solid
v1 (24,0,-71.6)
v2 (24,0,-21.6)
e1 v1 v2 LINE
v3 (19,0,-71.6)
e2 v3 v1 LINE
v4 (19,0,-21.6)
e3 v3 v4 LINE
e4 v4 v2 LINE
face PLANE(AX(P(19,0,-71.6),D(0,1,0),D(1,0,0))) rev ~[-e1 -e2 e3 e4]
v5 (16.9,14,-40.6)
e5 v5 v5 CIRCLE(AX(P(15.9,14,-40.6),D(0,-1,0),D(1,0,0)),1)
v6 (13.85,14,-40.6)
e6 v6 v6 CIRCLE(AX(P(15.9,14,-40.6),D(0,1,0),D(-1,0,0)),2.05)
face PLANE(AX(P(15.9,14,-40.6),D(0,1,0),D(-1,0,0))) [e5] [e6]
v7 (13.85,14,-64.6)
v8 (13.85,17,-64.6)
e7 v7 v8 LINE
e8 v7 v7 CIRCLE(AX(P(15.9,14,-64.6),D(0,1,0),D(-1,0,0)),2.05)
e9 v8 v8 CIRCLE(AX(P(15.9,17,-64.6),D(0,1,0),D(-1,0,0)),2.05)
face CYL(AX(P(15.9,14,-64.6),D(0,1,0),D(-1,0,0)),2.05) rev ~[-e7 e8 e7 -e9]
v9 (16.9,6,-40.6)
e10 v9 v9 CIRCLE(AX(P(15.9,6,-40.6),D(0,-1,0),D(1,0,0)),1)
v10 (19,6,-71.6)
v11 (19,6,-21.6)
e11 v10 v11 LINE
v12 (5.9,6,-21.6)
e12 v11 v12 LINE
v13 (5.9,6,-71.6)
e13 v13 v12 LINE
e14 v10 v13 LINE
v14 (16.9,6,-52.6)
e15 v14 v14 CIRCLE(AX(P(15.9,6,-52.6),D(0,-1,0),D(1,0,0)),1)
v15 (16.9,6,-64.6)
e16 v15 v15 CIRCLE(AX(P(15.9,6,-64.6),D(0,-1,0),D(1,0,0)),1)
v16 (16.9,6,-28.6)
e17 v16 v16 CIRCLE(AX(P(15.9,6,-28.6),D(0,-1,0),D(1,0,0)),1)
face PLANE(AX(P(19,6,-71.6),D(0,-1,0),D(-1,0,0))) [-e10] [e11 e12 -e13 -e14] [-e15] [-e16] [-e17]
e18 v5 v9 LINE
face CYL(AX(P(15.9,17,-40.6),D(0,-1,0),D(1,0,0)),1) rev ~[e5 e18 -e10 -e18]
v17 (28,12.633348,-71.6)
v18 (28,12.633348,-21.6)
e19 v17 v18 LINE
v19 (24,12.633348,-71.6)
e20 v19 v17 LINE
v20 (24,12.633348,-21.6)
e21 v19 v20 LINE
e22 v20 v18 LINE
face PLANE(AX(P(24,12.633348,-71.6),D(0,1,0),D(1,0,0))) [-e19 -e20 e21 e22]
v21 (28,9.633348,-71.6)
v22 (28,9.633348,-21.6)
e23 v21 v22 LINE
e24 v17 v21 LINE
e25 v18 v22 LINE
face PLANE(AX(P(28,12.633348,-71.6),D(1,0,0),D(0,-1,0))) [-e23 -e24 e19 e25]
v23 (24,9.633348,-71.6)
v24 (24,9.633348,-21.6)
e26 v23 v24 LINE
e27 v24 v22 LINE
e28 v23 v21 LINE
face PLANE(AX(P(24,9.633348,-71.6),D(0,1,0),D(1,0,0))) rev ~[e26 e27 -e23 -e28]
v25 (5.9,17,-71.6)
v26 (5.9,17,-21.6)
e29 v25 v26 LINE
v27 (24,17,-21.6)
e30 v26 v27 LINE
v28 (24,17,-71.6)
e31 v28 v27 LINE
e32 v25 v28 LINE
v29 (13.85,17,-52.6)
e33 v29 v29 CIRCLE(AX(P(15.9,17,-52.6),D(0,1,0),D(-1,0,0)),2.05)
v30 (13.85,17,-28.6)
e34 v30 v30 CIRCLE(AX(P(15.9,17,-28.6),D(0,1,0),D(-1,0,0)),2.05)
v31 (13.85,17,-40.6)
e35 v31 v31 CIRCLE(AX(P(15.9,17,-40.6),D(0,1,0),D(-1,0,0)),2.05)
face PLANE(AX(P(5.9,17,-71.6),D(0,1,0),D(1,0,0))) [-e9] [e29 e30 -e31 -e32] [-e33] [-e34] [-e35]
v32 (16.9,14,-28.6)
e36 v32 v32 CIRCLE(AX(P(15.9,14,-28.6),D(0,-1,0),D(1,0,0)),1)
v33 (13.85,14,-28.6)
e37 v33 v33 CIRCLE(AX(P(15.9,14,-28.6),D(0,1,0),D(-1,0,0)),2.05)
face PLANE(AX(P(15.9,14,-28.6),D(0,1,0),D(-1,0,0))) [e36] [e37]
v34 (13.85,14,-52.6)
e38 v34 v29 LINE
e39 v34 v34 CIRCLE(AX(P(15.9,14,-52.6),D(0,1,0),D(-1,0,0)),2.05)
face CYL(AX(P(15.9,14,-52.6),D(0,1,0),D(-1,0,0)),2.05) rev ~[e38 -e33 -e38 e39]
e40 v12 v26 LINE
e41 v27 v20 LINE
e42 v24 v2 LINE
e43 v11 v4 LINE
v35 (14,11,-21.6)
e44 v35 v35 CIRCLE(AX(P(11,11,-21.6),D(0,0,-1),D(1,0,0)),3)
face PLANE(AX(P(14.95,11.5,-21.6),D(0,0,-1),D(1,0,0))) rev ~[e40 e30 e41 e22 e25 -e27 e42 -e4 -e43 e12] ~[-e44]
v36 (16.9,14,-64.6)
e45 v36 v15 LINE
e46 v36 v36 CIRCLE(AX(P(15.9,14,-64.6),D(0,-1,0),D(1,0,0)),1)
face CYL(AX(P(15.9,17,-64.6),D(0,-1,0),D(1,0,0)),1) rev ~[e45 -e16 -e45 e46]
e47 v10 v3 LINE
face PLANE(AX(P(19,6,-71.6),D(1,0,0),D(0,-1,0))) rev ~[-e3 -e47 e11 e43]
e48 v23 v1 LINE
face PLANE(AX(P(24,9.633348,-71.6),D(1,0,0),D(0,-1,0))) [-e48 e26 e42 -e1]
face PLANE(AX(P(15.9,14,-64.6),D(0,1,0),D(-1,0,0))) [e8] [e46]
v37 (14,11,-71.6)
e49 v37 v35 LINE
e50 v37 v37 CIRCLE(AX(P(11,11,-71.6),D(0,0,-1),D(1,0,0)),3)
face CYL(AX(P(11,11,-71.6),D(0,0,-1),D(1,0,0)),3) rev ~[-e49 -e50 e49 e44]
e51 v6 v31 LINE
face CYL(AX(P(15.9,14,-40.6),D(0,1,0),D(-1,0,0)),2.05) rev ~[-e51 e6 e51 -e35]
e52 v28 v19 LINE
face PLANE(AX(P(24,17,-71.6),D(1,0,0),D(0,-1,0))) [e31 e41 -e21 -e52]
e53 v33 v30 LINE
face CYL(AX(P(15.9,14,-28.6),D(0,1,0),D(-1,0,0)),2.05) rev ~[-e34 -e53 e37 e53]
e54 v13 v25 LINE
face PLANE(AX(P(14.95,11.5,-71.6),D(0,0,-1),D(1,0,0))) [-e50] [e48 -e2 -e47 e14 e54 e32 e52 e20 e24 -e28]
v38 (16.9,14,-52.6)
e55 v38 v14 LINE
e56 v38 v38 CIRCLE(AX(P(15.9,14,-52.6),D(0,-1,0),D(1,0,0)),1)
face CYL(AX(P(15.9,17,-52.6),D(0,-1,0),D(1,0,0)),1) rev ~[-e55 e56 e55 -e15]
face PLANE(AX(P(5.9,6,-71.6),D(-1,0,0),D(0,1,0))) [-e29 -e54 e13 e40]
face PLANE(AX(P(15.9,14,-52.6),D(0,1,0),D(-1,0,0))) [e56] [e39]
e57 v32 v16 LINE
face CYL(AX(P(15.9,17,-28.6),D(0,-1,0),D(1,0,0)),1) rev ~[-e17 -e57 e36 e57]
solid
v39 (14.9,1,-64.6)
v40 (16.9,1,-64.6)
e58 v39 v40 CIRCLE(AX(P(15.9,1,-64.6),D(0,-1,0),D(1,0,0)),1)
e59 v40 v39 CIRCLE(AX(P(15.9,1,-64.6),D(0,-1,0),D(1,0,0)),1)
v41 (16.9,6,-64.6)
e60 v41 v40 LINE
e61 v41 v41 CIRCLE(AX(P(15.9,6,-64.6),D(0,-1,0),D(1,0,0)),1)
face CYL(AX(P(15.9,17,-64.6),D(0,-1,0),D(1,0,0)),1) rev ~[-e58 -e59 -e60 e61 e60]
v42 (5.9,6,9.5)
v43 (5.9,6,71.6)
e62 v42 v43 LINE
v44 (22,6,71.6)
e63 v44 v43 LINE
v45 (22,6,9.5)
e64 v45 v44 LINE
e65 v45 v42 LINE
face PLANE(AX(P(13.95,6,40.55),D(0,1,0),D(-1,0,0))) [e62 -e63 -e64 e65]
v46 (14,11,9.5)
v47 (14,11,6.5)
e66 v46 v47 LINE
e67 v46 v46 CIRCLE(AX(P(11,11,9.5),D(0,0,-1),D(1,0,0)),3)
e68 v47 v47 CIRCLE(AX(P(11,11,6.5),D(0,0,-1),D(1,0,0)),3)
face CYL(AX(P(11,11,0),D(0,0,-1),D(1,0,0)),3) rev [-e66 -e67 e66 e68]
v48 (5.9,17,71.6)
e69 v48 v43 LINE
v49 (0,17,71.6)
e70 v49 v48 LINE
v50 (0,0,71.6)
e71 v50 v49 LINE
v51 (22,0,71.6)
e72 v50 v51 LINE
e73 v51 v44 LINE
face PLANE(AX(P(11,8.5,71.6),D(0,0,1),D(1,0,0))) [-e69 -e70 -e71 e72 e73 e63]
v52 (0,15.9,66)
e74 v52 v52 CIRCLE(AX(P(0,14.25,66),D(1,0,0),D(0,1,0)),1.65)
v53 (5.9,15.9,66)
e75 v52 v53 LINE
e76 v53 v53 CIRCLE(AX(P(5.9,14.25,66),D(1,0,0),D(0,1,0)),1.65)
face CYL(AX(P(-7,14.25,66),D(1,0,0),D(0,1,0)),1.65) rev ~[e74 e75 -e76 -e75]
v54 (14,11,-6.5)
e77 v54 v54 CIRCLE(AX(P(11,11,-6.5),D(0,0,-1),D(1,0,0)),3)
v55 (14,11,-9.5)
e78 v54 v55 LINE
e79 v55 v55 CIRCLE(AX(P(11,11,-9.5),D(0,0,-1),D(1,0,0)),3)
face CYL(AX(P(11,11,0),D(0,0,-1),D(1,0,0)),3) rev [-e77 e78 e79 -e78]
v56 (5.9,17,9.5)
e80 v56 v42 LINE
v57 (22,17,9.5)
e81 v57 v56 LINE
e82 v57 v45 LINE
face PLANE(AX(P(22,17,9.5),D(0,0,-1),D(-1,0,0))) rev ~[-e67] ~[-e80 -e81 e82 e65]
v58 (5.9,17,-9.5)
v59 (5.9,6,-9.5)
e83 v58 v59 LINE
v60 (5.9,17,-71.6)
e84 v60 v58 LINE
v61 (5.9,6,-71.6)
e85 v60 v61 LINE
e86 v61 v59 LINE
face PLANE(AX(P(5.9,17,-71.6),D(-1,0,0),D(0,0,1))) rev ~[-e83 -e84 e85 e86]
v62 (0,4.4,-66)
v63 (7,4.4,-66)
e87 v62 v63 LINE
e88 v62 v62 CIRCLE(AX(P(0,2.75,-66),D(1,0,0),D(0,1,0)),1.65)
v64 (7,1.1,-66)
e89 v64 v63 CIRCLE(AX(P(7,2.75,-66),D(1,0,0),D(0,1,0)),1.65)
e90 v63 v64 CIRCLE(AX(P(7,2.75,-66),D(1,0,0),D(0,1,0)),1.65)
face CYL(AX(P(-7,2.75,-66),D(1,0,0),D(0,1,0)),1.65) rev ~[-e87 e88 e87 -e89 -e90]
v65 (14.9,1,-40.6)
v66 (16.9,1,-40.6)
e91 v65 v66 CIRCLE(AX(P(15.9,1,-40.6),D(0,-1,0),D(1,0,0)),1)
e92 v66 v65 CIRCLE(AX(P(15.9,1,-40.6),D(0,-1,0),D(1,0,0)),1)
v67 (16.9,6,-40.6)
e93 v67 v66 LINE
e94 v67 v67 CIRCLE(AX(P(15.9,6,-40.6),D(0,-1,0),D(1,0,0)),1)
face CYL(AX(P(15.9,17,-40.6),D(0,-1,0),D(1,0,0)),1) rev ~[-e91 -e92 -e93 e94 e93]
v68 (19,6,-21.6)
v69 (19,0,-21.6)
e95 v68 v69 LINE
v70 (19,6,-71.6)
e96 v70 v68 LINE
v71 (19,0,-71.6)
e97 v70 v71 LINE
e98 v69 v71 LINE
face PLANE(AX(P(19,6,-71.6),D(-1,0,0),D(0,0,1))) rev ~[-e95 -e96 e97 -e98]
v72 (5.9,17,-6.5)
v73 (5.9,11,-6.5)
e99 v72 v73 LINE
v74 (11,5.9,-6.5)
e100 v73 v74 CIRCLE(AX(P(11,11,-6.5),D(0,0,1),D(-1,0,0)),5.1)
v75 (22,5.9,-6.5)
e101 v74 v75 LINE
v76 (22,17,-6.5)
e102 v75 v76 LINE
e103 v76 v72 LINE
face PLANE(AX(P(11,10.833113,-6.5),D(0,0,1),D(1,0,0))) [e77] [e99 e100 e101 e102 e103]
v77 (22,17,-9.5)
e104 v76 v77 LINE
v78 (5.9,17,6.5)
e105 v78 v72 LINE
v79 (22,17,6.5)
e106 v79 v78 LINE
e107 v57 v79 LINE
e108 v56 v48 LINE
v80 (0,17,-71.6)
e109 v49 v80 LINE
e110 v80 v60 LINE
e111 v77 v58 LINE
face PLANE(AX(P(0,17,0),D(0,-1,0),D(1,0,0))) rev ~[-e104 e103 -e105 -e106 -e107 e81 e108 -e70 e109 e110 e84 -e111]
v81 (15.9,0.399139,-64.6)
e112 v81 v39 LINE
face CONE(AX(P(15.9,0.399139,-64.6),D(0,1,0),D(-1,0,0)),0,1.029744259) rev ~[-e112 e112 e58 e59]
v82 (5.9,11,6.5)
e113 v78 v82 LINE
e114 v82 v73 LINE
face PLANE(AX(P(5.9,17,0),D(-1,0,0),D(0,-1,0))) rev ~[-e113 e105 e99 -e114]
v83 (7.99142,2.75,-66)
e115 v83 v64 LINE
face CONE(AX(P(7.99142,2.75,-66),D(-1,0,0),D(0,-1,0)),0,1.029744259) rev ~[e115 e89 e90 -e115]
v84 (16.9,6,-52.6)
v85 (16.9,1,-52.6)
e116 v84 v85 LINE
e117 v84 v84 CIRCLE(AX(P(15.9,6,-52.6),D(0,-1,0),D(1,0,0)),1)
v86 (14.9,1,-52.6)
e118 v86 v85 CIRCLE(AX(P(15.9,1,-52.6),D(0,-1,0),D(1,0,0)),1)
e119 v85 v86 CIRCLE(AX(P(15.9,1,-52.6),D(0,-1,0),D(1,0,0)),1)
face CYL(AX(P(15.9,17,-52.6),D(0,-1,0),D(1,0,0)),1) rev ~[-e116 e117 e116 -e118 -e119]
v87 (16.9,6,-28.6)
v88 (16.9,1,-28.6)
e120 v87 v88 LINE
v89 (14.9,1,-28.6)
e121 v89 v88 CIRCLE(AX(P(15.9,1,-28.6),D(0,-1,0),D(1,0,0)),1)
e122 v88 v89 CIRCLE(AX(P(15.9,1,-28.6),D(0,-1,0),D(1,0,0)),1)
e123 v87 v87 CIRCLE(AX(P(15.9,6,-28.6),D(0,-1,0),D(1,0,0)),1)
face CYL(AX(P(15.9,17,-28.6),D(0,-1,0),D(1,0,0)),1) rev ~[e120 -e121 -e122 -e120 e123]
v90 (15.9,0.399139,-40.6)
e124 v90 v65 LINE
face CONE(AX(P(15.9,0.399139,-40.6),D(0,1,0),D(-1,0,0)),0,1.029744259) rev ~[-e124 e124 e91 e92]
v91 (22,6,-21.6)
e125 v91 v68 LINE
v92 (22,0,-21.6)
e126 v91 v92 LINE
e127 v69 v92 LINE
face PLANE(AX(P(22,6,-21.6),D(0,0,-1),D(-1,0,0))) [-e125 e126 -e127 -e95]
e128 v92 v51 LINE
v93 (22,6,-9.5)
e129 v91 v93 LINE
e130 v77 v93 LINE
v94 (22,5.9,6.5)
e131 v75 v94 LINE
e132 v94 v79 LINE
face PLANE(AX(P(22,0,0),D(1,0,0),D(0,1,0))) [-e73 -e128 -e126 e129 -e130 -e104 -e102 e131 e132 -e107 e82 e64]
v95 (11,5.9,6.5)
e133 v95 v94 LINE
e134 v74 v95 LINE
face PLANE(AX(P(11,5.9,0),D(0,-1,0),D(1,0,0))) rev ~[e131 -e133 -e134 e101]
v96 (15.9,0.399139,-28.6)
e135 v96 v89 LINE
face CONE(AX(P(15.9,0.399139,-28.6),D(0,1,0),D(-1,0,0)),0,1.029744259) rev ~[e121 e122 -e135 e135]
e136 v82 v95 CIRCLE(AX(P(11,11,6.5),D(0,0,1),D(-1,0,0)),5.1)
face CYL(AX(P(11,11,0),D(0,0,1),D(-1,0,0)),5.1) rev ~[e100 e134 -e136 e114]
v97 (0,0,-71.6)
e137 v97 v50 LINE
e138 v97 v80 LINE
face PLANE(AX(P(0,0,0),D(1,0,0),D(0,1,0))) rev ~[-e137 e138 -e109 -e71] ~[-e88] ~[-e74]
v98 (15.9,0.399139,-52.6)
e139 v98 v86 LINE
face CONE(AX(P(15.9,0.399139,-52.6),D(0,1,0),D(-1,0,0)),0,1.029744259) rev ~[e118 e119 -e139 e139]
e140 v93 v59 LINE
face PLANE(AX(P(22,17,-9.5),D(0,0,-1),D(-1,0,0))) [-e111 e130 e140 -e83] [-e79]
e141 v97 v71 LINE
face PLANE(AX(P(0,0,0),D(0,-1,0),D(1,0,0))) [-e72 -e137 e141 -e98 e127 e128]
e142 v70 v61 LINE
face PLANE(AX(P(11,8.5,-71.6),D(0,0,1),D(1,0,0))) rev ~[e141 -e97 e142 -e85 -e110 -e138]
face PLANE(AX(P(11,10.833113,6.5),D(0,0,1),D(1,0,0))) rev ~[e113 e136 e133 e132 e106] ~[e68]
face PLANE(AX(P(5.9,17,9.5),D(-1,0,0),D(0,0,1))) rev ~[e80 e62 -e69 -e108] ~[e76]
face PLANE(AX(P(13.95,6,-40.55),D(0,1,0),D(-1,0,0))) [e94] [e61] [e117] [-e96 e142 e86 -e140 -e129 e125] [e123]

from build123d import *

# Parameters (mm, degrees)
F0_W              = 22
F0_H              = 17
F0_R              = 3
F1_DEPTH          = 71.6
F3_DEPTH          = 6.5
F4_W              = 16.1
F4_H              = 62.1
F5_DEPTH          = 11
F6_W              = 3
F6_H              = 50
F7_DEPTH          = 25
F9_D              = 3.3
F9_DEPTH          = 7
F9_TIP            = 0.9914200214
F10_R             = 3
F10_W             = 5
F10_H             = 6
F10_W_2           = 4
F10_H_2           = 3
F11_DEPTH         = 50
F13_D             = 2
F13_DEPTH         = 16
F13_CBORE_D       = 4.1
F13_CBORE_DEPTH   = 3
F13_TIP           = 0.600860619
F13_2_D           = 2
F13_2_DEPTH       = 16
F13_2_CBORE_D     = 4.1
F13_2_CBORE_DEPTH = 3
F13_2_TIP         = 0.600860619


with BuildPart() as f1:
    # F0 (on Top) → F1 (new body, symmetric)
    with BuildSketch(Plane.XY):
        with Locations((11, 8.5)):
            Rectangle(F0_W, F0_H)
        with Locations((11, 11)):
            Circle(F0_R, mode=Mode.SUBTRACT)
    extrude(amount=F1_DEPTH, both=True)

    # F2 (on Top) → F3 (cut, symmetric)
    with BuildSketch(Plane.XY):
        with BuildLine():
            ThreePointArc((11, 5.9), (14.6062445841, 7.3937554159), (16.1, 11))
            ThreePointArc((16.1, 11), (11, 16.1), (5.9, 11))
            ThreePointArc((5.9, 11), (7.3937554159, 7.3937554159), (11, 5.9))
        make_face()
        with BuildLine():
            ThreePointArc((5.9, 11), (11, 16.1), (16.1, 11))
            ThreePointArc((16.1, 11), (14.6062445841, 7.3937554159), (11, 5.9))
            Line((11, 5.9), (22, 5.9))
            Line((22, 5.9), (22, 17))
            Line((22, 17), (5.9, 17))
            Line((5.9, 17), (5.9, 11))
        make_face()
    extrude(amount=F3_DEPTH, both=True, mode=Mode.SUBTRACT)

    # F4 (on face) → F5 (cut)
    with BuildSketch(Plane(origin=(0, 17, 0), x_dir=(-1, 0, 0), z_dir=(0, 1, 0))):
        with Locations((-13.95, -40.55)):
            Rectangle(F4_W, F4_H)
        with Locations((-13.95, 40.55)):
            Rectangle(F4_W, F4_H)
    extrude(amount=-F5_DEPTH, mode=Mode.SUBTRACT)

    # F6 (on face) → F7 (cut)
    with BuildSketch(Plane(origin=(0, 6, 0), x_dir=(-1, 0, 0), z_dir=(0, 1, 0))):
        with Locations((-20.5, -46.6)):
            Rectangle(F6_W, F6_H)
    extrude(amount=-F7_DEPTH, mode=Mode.SUBTRACT)

    # F9
    with Locations(Plane(origin=(0, 0, 0), x_dir=(0, -1, 0), z_dir=(-1, 0, 0))):
        with Locations((-2.75, -66), (-14.25, 66)):
            Hole(F9_D / 2, depth=F9_DEPTH)
            with Locations((0, 0, -(F9_DEPTH + F9_TIP / 2))):  # 118° drill point
                Cone(0, F9_D / 2, F9_TIP, mode=Mode.SUBTRACT)

    # F13
    with Locations(Plane(origin=(0, 17, 0), x_dir=(-1, 0, 0), z_dir=(0, 1, 0))):
        with Locations((-15.9, -64.6), (-15.9, -52.6), (-15.9, -40.6), (-15.9, -28.6)):
            CounterBoreHole(F13_D / 2, F13_CBORE_D / 2, F13_CBORE_DEPTH, depth=F13_DEPTH)
            with Locations((0, 0, -(F13_DEPTH + F13_TIP / 2))):  # 118° drill point
                Cone(0, F13_D / 2, F13_TIP, mode=Mode.SUBTRACT)


with BuildPart() as f11:
    # F10 (on face) → F11 (new body)
    with BuildSketch(Plane(origin=(0, 0, -71.6), x_dir=(1, 0, 0), z_dir=(0, 0, -1))):
        Polygon((19, -6), (5.9, -6), (5.9, -17), (24, -17), (24, -12.6333478838), (24, -9.6333478838), (24, -6), align=None)
        with Locations((11, -11)):
            Circle(F10_R, mode=Mode.SUBTRACT)
        with Locations((21.5, -3)):
            Rectangle(F10_W, F10_H)
        with Locations((26, -11.1333478838)):
            Rectangle(F10_W_2, F10_H_2)
    extrude(amount=-F11_DEPTH)

    # F13#2
    with Locations(Plane(origin=(0, 17, 0), x_dir=(-1, 0, 0), z_dir=(0, 1, 0))):
        with Locations((-15.9, -64.6), (-15.9, -52.6), (-15.9, -40.6), (-15.9, -28.6)):
            CounterBoreHole(F13_2_D / 2, F13_2_CBORE_D / 2, F13_2_CBORE_DEPTH, depth=F13_2_DEPTH)
            with Locations((0, 0, -(F13_2_DEPTH + F13_2_TIP / 2))):  # 118° drill point
                Cone(0, F13_2_D / 2, F13_2_TIP, mode=Mode.SUBTRACT)


solid = Compound([f1.part, f11.part])
